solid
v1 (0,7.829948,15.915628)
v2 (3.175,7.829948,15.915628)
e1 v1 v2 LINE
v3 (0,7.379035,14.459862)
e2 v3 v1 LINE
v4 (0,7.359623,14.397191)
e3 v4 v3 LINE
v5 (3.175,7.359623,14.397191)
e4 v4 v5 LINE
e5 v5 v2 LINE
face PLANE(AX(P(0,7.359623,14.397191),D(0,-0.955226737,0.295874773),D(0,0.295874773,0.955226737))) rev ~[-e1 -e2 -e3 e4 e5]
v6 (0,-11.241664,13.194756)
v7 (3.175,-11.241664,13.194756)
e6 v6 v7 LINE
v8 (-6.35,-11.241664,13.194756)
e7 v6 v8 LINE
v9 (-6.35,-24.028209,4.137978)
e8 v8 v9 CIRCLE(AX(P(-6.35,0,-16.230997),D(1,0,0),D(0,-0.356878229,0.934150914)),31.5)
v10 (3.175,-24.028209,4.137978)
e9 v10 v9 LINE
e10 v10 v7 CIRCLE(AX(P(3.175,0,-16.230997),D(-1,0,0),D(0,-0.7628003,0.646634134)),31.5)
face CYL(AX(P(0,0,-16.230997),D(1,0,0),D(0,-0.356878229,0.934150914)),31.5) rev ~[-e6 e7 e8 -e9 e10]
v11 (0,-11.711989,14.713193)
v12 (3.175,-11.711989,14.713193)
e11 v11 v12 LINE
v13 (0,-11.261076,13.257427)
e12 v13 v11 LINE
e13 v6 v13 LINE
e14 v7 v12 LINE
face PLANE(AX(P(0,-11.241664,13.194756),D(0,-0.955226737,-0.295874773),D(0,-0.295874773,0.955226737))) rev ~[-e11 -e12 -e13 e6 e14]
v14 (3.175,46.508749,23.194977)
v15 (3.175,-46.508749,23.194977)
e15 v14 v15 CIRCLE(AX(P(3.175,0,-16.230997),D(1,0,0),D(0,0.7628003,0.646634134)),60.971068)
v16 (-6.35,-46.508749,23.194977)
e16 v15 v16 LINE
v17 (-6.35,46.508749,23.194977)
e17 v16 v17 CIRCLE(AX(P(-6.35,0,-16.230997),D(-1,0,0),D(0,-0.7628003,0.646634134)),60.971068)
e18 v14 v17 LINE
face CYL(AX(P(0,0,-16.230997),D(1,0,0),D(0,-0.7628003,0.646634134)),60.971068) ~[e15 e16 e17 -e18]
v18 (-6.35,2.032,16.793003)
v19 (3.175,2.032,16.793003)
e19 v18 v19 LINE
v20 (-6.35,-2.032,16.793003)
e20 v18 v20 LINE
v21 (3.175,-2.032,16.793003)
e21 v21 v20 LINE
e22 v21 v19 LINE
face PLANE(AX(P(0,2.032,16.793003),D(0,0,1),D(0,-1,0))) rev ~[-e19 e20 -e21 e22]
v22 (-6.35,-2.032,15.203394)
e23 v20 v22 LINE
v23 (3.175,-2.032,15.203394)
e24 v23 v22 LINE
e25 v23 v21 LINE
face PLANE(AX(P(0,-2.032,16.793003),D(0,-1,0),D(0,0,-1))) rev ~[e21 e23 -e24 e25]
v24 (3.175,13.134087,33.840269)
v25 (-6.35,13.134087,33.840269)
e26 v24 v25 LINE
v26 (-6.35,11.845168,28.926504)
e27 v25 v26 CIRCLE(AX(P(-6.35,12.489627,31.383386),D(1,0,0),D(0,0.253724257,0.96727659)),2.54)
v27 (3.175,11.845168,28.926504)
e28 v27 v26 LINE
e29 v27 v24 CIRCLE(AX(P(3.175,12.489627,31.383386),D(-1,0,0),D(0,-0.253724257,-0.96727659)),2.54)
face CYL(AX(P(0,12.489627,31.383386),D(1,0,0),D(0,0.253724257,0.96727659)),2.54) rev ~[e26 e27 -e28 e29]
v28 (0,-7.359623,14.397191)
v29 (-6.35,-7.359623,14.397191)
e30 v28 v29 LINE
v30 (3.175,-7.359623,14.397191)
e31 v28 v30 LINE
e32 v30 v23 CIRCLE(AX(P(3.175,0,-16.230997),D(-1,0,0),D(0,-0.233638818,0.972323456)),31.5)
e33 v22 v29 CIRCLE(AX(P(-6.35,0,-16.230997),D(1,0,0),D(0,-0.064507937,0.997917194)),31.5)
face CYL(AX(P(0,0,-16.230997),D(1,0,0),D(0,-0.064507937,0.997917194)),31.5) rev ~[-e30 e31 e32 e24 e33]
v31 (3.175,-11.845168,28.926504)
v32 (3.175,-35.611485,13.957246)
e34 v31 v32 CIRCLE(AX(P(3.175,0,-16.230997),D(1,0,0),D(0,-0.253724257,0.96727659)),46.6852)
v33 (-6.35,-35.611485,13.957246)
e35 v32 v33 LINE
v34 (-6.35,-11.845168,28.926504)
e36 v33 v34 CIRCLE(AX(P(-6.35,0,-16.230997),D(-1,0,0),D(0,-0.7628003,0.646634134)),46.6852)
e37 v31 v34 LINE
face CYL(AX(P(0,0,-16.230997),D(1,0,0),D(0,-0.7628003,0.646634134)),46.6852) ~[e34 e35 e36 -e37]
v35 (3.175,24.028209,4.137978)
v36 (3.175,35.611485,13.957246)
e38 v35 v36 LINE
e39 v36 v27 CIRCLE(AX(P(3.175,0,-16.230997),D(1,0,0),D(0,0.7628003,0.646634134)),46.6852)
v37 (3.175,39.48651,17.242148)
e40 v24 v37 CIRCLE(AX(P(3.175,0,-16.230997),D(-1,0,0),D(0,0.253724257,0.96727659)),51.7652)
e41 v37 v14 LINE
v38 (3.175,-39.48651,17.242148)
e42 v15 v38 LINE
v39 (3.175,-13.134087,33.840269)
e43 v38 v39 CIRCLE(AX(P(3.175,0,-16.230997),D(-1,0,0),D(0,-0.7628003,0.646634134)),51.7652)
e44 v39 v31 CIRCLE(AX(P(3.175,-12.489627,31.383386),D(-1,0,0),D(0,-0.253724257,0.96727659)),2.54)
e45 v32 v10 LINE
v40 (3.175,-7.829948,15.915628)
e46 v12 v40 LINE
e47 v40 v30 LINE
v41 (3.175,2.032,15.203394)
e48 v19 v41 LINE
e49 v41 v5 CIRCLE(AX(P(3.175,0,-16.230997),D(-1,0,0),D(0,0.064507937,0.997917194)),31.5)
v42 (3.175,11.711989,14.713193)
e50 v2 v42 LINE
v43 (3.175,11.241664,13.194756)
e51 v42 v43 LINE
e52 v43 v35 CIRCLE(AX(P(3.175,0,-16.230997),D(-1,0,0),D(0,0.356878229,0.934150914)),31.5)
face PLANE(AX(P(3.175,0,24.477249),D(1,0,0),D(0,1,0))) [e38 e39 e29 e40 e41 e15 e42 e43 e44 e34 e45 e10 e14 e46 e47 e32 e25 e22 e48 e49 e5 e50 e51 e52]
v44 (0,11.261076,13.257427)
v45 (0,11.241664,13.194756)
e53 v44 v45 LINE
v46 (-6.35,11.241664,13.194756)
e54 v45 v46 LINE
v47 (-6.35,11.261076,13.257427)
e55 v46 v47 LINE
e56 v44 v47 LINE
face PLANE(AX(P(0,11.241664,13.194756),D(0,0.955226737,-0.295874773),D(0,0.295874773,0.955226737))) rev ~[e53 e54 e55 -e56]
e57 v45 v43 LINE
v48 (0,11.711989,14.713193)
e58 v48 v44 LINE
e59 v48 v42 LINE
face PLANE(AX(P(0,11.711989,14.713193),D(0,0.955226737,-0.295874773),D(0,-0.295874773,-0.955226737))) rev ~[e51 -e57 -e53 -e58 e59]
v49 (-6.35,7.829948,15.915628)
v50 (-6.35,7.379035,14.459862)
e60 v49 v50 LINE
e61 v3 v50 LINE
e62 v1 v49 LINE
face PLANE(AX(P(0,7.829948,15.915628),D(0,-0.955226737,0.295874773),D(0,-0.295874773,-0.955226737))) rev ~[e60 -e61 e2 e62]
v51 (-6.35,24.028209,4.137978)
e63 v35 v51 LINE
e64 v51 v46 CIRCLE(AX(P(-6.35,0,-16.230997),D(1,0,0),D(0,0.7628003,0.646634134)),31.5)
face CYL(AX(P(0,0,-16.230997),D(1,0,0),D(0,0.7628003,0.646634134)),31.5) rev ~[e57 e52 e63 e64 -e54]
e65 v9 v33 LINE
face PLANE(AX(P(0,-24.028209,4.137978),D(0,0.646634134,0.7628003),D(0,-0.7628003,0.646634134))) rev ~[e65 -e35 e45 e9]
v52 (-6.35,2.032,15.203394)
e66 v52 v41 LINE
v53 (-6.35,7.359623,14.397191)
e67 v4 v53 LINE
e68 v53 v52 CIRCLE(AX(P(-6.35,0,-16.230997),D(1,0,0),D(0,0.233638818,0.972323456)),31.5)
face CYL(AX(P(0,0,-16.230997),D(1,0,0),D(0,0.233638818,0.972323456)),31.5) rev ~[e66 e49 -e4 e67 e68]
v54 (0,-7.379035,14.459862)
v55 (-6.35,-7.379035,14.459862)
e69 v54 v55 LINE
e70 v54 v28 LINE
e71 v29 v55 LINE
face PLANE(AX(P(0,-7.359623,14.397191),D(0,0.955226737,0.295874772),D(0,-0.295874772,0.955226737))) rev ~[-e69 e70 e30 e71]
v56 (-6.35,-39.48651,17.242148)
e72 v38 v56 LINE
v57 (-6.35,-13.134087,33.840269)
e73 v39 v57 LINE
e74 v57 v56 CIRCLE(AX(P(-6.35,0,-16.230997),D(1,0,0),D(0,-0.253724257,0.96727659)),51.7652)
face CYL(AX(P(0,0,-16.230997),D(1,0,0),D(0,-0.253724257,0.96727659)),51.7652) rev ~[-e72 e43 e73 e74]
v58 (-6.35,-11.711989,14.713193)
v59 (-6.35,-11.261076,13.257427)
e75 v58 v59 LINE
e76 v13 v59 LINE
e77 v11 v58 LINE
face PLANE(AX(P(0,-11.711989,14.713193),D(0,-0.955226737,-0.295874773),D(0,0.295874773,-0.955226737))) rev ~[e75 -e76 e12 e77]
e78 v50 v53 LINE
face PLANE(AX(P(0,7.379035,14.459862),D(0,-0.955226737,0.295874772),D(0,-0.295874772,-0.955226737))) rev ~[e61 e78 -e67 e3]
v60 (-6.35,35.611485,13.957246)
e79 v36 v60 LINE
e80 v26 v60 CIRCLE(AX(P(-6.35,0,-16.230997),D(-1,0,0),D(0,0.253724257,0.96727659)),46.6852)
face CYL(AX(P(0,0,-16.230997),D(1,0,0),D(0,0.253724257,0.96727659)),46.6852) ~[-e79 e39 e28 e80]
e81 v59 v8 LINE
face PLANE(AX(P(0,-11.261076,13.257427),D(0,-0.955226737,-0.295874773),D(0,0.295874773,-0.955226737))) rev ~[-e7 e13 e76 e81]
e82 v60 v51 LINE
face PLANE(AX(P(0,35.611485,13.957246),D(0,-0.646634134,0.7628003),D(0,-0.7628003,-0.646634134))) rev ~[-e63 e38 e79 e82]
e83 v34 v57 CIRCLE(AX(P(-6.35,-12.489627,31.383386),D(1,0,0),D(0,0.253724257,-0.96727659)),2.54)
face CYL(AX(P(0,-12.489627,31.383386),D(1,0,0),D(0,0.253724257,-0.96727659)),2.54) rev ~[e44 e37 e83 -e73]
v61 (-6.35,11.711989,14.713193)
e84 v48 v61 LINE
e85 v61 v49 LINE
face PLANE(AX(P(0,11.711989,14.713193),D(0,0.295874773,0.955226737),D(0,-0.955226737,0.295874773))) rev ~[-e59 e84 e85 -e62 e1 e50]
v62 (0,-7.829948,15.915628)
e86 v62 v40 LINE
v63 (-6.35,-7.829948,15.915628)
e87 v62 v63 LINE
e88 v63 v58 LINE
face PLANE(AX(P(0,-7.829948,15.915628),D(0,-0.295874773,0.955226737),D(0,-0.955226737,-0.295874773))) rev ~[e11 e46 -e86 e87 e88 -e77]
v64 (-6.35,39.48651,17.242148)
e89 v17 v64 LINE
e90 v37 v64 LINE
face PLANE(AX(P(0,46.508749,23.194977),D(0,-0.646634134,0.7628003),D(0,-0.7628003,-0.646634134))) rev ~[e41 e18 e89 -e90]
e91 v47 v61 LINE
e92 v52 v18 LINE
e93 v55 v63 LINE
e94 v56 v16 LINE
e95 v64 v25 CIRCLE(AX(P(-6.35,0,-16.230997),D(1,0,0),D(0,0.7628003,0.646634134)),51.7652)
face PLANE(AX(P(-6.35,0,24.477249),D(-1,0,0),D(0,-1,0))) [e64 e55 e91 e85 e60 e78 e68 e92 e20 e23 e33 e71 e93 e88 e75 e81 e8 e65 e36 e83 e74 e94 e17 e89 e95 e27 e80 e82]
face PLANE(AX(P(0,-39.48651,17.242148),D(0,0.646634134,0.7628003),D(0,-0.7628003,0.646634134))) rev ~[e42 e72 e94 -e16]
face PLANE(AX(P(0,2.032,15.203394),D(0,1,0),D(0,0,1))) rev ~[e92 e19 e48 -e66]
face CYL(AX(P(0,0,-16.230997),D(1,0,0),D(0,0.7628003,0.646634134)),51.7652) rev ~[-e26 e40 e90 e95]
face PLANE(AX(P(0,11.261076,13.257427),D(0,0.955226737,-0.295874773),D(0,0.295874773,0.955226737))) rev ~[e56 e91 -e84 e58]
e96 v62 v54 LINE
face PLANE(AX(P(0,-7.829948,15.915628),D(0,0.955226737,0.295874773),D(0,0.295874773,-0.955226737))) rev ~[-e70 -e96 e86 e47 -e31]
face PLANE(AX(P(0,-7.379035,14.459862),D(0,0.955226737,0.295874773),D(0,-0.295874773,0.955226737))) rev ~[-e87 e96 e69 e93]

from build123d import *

# Parameters (mm, degrees)
F1_DEPTH = 3.175
F3_DEPTH = 6.35


with BuildPart() as f1:
    # F0 (on Right) → F1 (new body)
    with BuildSketch(Plane.YZ):
        with BuildLine():
            ThreePointArc((11.2416642137, 13.194756409), (18.2070674879, 9.4741128861), (24.0282094439, 4.1379778313))
            Line((24.0282094439, 4.1379778313), (35.6114845565, 13.9572464754))
            ThreePointArc((35.6114845565, 13.9572464754), (24.8807782287, 23.2715946139), (11.8451676598, 28.9265036877))
            ThreePointArc((11.8451676598, 28.9265036877), (10.0327447326, 32.0278458379), (13.1340868829, 33.8402687651))
            ThreePointArc((13.1340868829, 33.8402687651), (27.588153444, 27.5700268215), (39.4865100795, 17.2421478736))
            Line((39.4865100795, 17.2421478736), (46.5087493001, 23.1949766478))
            ThreePointArc((46.5087493001, 23.1949766478), (0, 44.7400710849), (-46.5087493001, 23.1949766478))
            Line((-46.5087493001, 23.1949766478), (-39.4865100795, 17.2421478736))
            ThreePointArc((-39.4865100795, 17.2421478736), (-27.588153444, 27.5700268215), (-13.1340868829, 33.8402687651))
            ThreePointArc((-13.1340868829, 33.8402687651), (-10.0327447326, 32.0278458379), (-11.8451676598, 28.9265036877))
            ThreePointArc((-11.8451676598, 28.9265036877), (-24.8807782287, 23.2715946139), (-35.6114845565, 13.9572464754))
            Line((-35.6114845565, 13.9572464754), (-24.0282094439, 4.1379778313))
            ThreePointArc((-24.0282094439, 4.1379778313), (-18.2070674879, 9.4741128861), (-11.2416642137, 13.194756409))
            Line((-11.2416642137, 13.194756409), (-11.7119892349, 14.7131928424))
            Line((-11.7119892349, 14.7131928424), (-7.8299477766, 15.9156279202))
            Line((-7.8299477766, 15.9156279202), (-7.3596227555, 14.3971914867))
            ThreePointArc((-7.3596227555, 14.3971914867), (-4.7130812866, 14.9144174535), (-2.032, 15.2033942376))
            Line((-2.032, 15.2033942376), (-2.032, 16.7930026258))
            Line((-2.032, 16.7930026258), (2.032, 16.7930026258))
            Line((2.032, 16.7930026258), (2.032, 15.2033942376))
            ThreePointArc((2.032, 15.2033942376), (4.7130812866, 14.9144174535), (7.3596227555, 14.3971914867))
            Line((7.3596227555, 14.3971914867), (7.8299477766, 15.9156279202))
            Line((7.8299477766, 15.9156279202), (11.7119892349, 14.7131928424))
            Line((11.7119892349, 14.7131928424), (11.2416642137, 13.194756409))
        make_face()
    extrude(amount=F1_DEPTH)

    # F2 (on face) → F3 (join)
    with BuildSketch(Plane(origin=(0, 0, 0), x_dir=(0, -1, 0), z_dir=(-1, 0, 0))):
        with BuildLine():
            Line((-2.032, 16.7930026258), (2.032, 16.7930026258))
            Line((2.032, 16.7930026258), (2.032, 15.2690026258))
            Line((2.032, 15.2690026258), (2.032, 15.2033942376))
            ThreePointArc((2.032, 15.2033942376), (4.7130812866, 14.9144174535), (7.3596227555, 14.3971914867))
            Line((7.3596227555, 14.3971914867), (7.3790346224, 14.4598623733))
            Line((7.3790346224, 14.4598623733), (7.8299477766, 15.9156279202))
            Line((7.8299477766, 15.9156279202), (11.7119892349, 14.7131928424))
            Line((11.7119892349, 14.7131928424), (11.2610760807, 13.2574272956))
            Line((11.2610760807, 13.2574272956), (11.2416642137, 13.194756409))
            ThreePointArc((11.2416642137, 13.194756409), (18.2070674879, 9.4741128861), (24.0282094439, 4.1379778313))
            Line((24.0282094439, 4.1379778313), (35.6114845565, 13.9572464754))
            ThreePointArc((35.6114845565, 13.9572464754), (24.8807782287, 23.2715946139), (11.8451676598, 28.9265036877))
            ThreePointArc((11.8451676598, 28.9265036877), (10.0327447326, 32.0278458379), (13.1340868829, 33.8402687651))
            ThreePointArc((13.1340868829, 33.8402687651), (27.588153444, 27.5700268215), (39.4865100795, 17.2421478736))
            Line((39.4865100795, 17.2421478736), (46.5087493001, 23.1949766478))
            ThreePointArc((46.5087493001, 23.1949766478), (0, 44.7400710849), (-46.5087493001, 23.1949766478))
            Line((-46.5087493001, 23.1949766478), (-39.4865100795, 17.2421478736))
            ThreePointArc((-39.4865100795, 17.2421478736), (-27.588153444, 27.5700268215), (-13.1340868829, 33.8402687651))
            ThreePointArc((-13.1340868829, 33.8402687651), (-10.0327447326, 32.0278458379), (-11.8451676598, 28.9265036877))
            ThreePointArc((-11.8451676598, 28.9265036877), (-24.8807782287, 23.2715946139), (-35.6114845565, 13.9572464754))
            Line((-35.6114845565, 13.9572464754), (-24.0282094439, 4.1379778313))
            ThreePointArc((-24.0282094439, 4.1379778313), (-18.2070674879, 9.4741128861), (-11.2416642137, 13.194756409))
            Line((-11.2416642137, 13.194756409), (-11.2610760807, 13.2574272956))
            Line((-11.2610760807, 13.2574272956), (-11.7119892349, 14.7131928424))
            Line((-11.7119892349, 14.7131928424), (-7.8299477766, 15.9156279202))
            Line((-7.8299477766, 15.9156279202), (-7.3790346224, 14.4598623733))
            Line((-7.3790346224, 14.4598623733), (-7.3596227555, 14.3971914867))
            ThreePointArc((-7.3596227555, 14.3971914867), (-4.7130812866, 14.9144174535), (-2.032, 15.2033942376))
            Line((-2.032, 15.2033942376), (-2.032, 15.2690026258))
            Line((-2.032, 15.2690026258), (-2.032, 16.7930026258))
        make_face()
    extrude(amount=F3_DEPTH)


solid = f1.part
